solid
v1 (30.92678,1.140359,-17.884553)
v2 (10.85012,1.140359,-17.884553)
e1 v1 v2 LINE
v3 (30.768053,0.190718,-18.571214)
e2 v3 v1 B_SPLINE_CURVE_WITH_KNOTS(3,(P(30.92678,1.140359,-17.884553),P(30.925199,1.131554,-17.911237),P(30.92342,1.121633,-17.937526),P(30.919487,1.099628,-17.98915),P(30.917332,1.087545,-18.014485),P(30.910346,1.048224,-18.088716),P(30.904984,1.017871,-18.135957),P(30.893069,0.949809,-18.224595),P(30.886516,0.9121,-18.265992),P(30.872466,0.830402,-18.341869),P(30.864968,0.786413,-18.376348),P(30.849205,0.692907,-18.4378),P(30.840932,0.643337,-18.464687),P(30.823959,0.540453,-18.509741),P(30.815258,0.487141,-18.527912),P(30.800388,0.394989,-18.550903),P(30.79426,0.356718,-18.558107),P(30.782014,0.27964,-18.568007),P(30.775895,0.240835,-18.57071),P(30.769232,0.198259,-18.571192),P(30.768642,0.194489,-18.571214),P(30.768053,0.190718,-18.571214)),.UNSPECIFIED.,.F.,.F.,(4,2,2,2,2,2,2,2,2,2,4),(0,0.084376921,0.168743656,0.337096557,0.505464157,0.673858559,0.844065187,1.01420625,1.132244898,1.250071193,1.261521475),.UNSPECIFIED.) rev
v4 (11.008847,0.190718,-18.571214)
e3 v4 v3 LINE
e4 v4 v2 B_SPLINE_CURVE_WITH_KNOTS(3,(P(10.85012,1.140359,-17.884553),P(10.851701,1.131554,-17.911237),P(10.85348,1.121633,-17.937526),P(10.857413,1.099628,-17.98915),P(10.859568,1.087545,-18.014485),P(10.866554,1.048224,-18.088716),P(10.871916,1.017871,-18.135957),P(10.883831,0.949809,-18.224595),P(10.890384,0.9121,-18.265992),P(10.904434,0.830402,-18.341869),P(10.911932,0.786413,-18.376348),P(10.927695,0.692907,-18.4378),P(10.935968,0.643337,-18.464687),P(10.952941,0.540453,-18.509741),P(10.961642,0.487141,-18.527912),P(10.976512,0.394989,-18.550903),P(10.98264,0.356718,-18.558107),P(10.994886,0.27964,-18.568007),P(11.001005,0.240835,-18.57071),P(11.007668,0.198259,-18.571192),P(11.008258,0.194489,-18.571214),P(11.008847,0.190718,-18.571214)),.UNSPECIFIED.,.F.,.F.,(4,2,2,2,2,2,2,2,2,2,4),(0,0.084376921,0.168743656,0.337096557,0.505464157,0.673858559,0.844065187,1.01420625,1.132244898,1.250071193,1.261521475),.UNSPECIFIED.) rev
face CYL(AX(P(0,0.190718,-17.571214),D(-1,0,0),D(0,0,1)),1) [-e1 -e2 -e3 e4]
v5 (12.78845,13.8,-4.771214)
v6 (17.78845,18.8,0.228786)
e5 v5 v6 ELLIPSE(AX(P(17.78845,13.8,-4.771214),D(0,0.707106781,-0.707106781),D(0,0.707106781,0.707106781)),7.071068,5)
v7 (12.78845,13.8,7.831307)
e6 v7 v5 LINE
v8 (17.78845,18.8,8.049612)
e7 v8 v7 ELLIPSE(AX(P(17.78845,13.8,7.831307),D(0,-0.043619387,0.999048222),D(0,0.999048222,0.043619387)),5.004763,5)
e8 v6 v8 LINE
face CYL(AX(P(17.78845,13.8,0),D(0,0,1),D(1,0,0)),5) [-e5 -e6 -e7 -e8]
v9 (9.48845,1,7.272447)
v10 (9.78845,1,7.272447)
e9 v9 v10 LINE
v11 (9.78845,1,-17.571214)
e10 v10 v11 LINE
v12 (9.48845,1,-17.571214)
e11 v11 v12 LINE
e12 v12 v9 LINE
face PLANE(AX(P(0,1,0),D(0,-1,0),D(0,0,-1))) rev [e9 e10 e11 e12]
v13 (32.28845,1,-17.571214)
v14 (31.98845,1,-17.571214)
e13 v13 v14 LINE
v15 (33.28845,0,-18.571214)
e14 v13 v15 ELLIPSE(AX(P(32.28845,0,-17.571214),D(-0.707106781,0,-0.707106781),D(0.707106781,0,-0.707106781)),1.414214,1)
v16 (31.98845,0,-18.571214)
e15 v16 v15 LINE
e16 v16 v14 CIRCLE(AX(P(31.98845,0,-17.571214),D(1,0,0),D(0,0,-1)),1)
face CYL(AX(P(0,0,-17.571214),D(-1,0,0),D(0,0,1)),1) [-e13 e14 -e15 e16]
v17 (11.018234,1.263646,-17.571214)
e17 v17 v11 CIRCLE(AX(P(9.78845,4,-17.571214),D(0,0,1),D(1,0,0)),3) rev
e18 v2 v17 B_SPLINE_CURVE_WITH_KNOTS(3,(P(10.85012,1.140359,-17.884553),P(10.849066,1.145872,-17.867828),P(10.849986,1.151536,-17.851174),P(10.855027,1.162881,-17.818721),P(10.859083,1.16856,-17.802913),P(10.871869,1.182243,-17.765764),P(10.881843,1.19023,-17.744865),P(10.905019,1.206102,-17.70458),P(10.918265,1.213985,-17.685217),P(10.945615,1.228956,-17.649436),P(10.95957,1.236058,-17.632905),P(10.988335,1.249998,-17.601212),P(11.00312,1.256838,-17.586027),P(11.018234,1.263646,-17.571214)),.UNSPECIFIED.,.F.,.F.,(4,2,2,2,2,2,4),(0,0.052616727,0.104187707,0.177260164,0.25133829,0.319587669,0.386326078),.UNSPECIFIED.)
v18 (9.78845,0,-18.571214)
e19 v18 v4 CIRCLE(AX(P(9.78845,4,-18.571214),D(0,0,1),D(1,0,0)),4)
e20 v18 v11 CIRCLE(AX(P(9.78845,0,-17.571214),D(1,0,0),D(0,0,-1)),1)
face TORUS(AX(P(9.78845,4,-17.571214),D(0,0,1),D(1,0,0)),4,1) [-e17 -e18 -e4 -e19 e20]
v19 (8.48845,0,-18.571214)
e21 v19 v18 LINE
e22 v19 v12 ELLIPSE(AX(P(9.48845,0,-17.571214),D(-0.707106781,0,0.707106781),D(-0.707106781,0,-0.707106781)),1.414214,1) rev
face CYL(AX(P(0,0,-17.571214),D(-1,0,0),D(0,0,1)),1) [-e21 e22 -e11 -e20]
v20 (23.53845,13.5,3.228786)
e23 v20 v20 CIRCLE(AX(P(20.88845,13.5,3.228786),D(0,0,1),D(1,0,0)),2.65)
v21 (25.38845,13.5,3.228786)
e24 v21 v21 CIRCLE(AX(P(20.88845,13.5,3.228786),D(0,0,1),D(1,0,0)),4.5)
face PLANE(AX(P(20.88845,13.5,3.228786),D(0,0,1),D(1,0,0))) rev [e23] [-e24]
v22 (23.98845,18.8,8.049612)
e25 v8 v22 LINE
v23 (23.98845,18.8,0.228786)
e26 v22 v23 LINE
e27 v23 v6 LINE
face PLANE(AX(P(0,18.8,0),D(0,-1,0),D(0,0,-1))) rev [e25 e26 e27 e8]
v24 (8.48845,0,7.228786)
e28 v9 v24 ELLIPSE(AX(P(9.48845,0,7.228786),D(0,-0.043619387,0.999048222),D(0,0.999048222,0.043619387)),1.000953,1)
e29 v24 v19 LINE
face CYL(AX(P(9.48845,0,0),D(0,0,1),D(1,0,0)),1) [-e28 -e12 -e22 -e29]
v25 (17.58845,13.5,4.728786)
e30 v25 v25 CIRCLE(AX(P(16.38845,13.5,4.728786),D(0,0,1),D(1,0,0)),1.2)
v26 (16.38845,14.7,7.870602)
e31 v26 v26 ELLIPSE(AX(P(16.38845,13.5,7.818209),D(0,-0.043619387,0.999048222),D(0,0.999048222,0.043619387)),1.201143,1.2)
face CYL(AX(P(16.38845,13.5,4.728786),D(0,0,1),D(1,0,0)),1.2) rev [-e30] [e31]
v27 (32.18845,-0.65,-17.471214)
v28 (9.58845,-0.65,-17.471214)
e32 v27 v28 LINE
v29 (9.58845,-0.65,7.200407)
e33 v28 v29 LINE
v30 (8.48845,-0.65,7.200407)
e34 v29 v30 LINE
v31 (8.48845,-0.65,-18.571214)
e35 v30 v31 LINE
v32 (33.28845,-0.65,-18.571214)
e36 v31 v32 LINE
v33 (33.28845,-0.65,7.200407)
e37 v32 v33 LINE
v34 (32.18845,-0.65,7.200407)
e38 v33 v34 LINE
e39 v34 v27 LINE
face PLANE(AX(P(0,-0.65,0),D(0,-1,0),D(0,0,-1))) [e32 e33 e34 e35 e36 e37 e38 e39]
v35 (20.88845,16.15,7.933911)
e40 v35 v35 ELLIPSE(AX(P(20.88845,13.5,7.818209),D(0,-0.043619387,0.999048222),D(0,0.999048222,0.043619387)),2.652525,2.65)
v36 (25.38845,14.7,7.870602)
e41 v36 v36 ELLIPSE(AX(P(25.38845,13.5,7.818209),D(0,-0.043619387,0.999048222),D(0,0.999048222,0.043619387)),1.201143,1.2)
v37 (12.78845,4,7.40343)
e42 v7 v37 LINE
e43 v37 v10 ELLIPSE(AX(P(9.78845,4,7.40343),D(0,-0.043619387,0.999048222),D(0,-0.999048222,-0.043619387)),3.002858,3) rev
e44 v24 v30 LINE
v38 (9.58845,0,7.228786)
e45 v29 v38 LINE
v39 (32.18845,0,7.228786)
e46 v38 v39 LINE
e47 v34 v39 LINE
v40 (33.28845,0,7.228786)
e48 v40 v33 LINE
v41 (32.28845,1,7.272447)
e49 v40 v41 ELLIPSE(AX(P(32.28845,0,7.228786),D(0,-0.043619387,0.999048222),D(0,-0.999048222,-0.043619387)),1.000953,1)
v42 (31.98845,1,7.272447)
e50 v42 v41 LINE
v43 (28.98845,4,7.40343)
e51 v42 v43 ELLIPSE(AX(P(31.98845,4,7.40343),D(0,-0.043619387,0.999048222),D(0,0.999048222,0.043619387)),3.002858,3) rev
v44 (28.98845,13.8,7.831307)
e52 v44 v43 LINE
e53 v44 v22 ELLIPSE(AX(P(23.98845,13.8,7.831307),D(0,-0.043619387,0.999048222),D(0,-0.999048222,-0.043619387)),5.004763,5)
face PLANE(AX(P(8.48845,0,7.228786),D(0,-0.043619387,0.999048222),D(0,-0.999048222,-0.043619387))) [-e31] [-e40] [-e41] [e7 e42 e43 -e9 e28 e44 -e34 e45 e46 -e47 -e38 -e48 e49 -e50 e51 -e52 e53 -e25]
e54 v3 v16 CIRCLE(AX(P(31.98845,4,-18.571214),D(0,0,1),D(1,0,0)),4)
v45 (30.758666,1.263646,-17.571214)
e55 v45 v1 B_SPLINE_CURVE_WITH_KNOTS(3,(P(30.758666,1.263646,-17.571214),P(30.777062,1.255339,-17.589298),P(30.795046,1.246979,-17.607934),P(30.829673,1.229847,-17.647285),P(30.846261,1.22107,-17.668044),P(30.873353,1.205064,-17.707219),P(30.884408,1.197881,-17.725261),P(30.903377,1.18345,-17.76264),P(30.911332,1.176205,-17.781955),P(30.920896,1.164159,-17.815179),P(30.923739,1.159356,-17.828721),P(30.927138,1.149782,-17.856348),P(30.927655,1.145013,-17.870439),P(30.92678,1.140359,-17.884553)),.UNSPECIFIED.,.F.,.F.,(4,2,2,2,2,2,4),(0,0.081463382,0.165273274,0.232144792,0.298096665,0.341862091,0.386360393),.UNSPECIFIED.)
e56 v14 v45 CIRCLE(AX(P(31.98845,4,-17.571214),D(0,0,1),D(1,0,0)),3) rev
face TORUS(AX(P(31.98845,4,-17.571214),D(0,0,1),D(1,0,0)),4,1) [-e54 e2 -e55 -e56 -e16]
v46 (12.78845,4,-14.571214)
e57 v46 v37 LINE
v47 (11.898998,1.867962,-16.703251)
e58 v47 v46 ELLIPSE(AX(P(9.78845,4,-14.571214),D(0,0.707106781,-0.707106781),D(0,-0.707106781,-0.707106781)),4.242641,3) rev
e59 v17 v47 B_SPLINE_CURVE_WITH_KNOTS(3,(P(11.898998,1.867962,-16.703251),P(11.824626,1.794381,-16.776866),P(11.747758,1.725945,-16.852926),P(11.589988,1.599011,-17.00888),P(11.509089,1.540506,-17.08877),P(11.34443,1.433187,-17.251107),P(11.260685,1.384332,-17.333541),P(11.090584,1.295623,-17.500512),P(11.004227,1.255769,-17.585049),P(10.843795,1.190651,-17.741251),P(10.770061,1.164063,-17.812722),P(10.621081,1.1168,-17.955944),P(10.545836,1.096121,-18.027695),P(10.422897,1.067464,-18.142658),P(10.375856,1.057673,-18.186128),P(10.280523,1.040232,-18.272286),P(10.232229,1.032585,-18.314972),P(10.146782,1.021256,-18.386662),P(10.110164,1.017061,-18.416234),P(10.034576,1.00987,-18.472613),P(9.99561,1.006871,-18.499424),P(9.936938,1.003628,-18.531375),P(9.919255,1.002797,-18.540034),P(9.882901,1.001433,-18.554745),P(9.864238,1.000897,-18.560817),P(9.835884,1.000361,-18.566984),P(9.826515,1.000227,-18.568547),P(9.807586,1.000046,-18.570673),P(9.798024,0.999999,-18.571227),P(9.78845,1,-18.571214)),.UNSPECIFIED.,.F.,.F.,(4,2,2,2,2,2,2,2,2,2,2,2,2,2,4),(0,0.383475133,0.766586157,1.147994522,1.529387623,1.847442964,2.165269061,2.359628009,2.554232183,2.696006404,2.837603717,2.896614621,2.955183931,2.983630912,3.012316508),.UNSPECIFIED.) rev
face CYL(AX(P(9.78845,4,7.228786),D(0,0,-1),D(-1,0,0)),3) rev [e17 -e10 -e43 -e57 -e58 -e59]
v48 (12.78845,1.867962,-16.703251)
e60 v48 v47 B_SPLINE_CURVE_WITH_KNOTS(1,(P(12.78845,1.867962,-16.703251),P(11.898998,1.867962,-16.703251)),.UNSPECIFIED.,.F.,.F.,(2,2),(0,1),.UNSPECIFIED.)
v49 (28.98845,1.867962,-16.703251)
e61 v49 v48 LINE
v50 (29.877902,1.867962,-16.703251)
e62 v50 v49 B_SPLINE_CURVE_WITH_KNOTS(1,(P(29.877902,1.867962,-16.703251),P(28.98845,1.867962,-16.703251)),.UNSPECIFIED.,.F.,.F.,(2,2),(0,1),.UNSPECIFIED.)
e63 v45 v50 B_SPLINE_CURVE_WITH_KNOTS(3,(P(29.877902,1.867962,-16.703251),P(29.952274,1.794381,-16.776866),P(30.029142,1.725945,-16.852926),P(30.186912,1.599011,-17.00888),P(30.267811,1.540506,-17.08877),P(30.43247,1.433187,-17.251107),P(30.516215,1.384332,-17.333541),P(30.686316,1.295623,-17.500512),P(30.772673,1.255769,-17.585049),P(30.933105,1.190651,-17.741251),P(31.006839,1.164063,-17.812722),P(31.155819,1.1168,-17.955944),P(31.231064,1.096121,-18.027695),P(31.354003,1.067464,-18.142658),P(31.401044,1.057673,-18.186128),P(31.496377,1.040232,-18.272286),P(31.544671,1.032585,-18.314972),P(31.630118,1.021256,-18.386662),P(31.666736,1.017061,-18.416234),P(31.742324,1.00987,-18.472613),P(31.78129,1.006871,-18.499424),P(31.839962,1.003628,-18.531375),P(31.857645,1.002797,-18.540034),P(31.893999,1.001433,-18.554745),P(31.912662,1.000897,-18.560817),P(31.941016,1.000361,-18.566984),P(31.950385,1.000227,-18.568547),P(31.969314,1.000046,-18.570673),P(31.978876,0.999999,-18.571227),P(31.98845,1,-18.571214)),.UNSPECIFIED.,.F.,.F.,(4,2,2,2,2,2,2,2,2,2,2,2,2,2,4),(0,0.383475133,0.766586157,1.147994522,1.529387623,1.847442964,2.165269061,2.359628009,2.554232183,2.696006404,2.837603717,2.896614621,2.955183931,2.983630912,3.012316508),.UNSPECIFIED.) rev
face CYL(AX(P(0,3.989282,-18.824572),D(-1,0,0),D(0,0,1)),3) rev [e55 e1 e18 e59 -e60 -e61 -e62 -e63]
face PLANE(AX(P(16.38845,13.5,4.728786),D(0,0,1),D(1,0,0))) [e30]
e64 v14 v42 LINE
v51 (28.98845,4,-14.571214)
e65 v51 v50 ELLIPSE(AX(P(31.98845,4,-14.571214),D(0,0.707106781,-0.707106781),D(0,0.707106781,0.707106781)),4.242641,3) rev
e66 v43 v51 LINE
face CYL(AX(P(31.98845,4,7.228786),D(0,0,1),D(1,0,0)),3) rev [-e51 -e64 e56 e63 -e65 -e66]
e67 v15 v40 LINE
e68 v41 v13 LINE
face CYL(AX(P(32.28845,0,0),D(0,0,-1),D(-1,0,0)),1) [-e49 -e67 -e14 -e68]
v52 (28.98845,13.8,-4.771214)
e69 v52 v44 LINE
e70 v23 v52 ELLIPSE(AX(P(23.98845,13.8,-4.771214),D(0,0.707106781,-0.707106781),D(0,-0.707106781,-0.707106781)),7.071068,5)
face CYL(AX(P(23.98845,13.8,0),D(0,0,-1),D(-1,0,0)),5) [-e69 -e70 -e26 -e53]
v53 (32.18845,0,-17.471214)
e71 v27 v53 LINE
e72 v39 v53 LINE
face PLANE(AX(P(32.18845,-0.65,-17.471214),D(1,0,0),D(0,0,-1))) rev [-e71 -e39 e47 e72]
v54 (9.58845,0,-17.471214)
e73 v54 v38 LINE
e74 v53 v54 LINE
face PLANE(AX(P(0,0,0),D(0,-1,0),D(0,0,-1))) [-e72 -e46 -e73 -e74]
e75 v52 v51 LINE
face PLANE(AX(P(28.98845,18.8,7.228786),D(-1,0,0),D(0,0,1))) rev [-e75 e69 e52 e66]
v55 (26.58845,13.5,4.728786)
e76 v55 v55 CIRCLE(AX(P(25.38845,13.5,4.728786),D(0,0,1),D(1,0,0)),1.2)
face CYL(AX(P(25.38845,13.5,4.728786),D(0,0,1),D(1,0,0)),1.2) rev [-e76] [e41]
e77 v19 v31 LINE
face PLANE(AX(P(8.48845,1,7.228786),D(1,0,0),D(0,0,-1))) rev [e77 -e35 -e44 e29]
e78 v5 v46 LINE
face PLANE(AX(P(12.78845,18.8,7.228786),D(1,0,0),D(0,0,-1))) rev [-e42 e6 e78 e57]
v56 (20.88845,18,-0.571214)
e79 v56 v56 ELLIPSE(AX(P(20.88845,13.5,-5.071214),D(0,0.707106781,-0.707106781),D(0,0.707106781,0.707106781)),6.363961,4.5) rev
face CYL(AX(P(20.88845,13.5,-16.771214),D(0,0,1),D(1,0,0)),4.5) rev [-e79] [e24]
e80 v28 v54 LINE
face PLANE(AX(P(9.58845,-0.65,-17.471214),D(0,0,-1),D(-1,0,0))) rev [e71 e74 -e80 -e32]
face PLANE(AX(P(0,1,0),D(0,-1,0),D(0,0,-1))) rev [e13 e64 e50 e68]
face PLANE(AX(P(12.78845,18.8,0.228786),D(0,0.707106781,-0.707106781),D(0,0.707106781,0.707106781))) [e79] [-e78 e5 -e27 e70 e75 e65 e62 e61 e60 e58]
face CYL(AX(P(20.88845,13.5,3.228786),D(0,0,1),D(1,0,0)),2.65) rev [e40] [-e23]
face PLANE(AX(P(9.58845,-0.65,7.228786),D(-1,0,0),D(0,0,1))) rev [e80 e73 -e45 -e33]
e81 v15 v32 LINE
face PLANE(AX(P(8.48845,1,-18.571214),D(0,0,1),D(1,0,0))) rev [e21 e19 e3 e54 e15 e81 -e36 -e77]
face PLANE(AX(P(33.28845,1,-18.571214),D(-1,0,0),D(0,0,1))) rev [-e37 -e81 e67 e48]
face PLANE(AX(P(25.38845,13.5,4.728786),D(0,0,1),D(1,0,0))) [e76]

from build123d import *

# Parameters (mm, degrees)
SKETCH1_W             = 24.8
SKETCH1_H             = 25.8
BOSS_EXTRUDE1_DEPTH   = 1
SKETCH3_W             = 16.2
SKETCH3_H             = 7
BOSS_EXTRUDE3_DEPTH   = 17.8
DRAFT2_ANGLE          = 45
TOP_FILLET_R          = 5
SKETCH4_R             = 2.65
HOLE_BOLT_DEPTH       = 4
SKETCH5_R             = 4.5
HOLE_BOLT_CAP_DEPTH   = 20
SKETCH6_R             = 1.2
HOLES_DOWEL_PIN_DEPTH = 2.5
BASE_FILLET_R         = 3
BRIM_DEPTH            = 0.65
INWARD_SLANT_ANGLE    = 2.5
FILLET1_START         = 8.48845
FILLET1_2_DEPTH       = 24.8
FILLET1_3_DEPTH       = 1.3
FILLET1_START_2       = 31.98845
FILLET1_4_DEPTH       = 1.3
FILLET1_START_3       = -20
FILLET1_5_DEPTH       = 28


with BuildPart() as part:
    # Sketch1 → Boss-Extrude1 (new body)
    with BuildSketch(Plane(origin=(0, 0, 0), x_dir=(1, 0, 0), z_dir=(0, 1, 0))):
        with Locations((20.88845, 5.671213532)):
            Rectangle(SKETCH1_W, SKETCH1_H)
    extrude(amount=BOSS_EXTRUDE1_DEPTH)

    # Sketch3 → Boss-Extrude3 (add)
    with BuildSketch(Plane(origin=(0, 1, 0), x_dir=(1, 0, 0), z_dir=(0, 1, 0))):
        with Locations((20.88845, -3.728786468)):
            Rectangle(SKETCH3_W, SKETCH3_H)
    extrude(amount=BOSS_EXTRUDE3_DEPTH)

    # Draft2
    draft2_faces = [part.faces().sort_by_distance(p)[0] for p in [
        (20.88845, 9.9, 0.228786468),
    ]]
    draft(draft2_faces, Plane.ZX.offset(18.8), DRAFT2_ANGLE)

    # top_fillet
    top_fillet_edges = [part.edges().sort_by_distance(p)[0] for p in [
        (12.78845, 18.8, 3.728786468),
        (28.98845, 18.8, 3.728786468),
    ]]
    fillet(top_fillet_edges, radius=TOP_FILLET_R)

    # Sketch4 → hole_bolt (cut)
    with BuildSketch(Plane.XY.offset(7.228786468)):
        with Locations((20.88845, 13.5)):
            Circle(SKETCH4_R)
    extrude(amount=-HOLE_BOLT_DEPTH, mode=Mode.SUBTRACT)

    # Sketch5 → hole_bolt_cap (cut)
    with BuildSketch(Plane.XY.offset(3.228786468)):
        with Locations((20.88845, 13.5)):
            Circle(SKETCH5_R)
    extrude(amount=-HOLE_BOLT_CAP_DEPTH, mode=Mode.SUBTRACT)

    # Sketch6 → holes_dowel_pin (cut)
    with BuildSketch(Plane.XY.offset(7.228786468)):
        with Locations((25.38845, 13.5)):
            Circle(SKETCH6_R)
        with Locations((16.38845, 13.5)):
            Circle(SKETCH6_R)
    extrude(amount=-HOLES_DOWEL_PIN_DEPTH, mode=Mode.SUBTRACT)

    # base_fillet
    # the kernel refuses this fillet: 3 mm, written as the material it adds along each edge
    with BuildSketch(Plane(origin=(12.78845, 1, -25.071213532), x_dir=(-1, 0, 0), z_dir=(0, 0, 1))) as base_fillet_piece_1_section:
        with BuildLine():
            CenterArc((BASE_FILLET_R, -BASE_FILLET_R), BASE_FILLET_R, 90, 90)
            Line((0, -BASE_FILLET_R), (0, 0))
            Line((0, 0), (BASE_FILLET_R, 0))
        make_face()
    base_fillet_piece_1 = extrude(amount=32.3, mode=Mode.PRIVATE)
    base_fillet_piece_1 = split(base_fillet_piece_1, bisect_by=Plane(origin=(12.78845, -2.75, -21.321213532), z_dir=(0, -0.7071067811865488, 0.7071067811865462)), keep=Keep.TOP, mode=Mode.PRIVATE)
    add(base_fillet_piece_1)
    with BuildSketch(Plane(origin=(28.98845, 1, 7.228786468), x_dir=(0, 1, 0), z_dir=(0, 0, -1))) as base_fillet_piece_2_section:
        with BuildLine():
            CenterArc((BASE_FILLET_R, BASE_FILLET_R), BASE_FILLET_R, 180, 90)
            Line((0, BASE_FILLET_R), (0, 0))
            Line((0, 0), (BASE_FILLET_R, 0))
        make_face()
    base_fillet_piece_2 = extrude(amount=32.3, mode=Mode.PRIVATE)
    base_fillet_piece_2 = split(base_fillet_piece_2, bisect_by=Plane(origin=(28.98845, 13.4, -5.171213532), z_dir=(0, -0.7071067811865488, 0.7071067811865462)), keep=Keep.TOP, mode=Mode.PRIVATE)
    add(base_fillet_piece_2)
    with BuildSketch(Plane(origin=(28.98845, 1, -17.571213532), x_dir=(0, 0, -1), z_dir=(-1, 0, 0))) as base_fillet_piece_3:
        with BuildLine():
            CenterArc((1.25335823, -2.989282457), BASE_FILLET_R, 94.844556223, 40.155443777)
            Line((-0.867962113, -0.867962113), (0, 0))
            Line((0, 0), (1, 0))
        make_face()
    extrude(amount=16.2)
    with BuildSketch(Plane(origin=(12.78845, 1, -25.071213532), x_dir=(-1, 0, 0), z_dir=(0, 0, 1))) as base_fillet_piece_4a_section:
        with BuildLine():
            CenterArc((BASE_FILLET_R, -BASE_FILLET_R), BASE_FILLET_R, 90, 90)
            Line((0, -BASE_FILLET_R), (0, 0))
            Line((0, 0), (BASE_FILLET_R, 0))
        make_face()
    base_fillet_piece_4a = extrude(amount=32.3, mode=Mode.PRIVATE)
    base_fillet_piece_4a = split(base_fillet_piece_4a, bisect_by=Plane(origin=(12.78845, -2.75, -21.321213532), z_dir=(0, 0.7071067811865488, -0.7071067811865462)), keep=Keep.TOP, mode=Mode.PRIVATE)
    base_fillet_piece_4a = split(base_fillet_piece_4a, bisect_by=Plane(origin=(12.78845, 1, -18.571213532), z_dir=(0, 0, 1)), keep=Keep.TOP, mode=Mode.PRIVATE)
    with BuildSketch(Plane(origin=(28.98845, 1, -17.571213532), x_dir=(0, 0, -1), z_dir=(-1, 0, 0))) as base_fillet_piece_4b_section:
        with BuildLine():
            CenterArc((1.25335823, -2.989282457), BASE_FILLET_R, 94.844556223, 40.155443777)
            Line((-0.867962113, -0.867962113), (0, 0))
            Line((0, 0), (1, 0))
        make_face()
    base_fillet_piece_4b = extrude(amount=19.268709481, mode=Mode.PRIVATE)
    base_fillet_piece_4b = split(base_fillet_piece_4b, bisect_by=Plane(origin=(12.78845, 1, -17.571213532), z_dir=(-1, 0, 0)), keep=Keep.TOP, mode=Mode.PRIVATE)
    base_fillet_piece_4 = base_fillet_piece_4a & base_fillet_piece_4b
    add(base_fillet_piece_4)
    with BuildSketch(Plane(origin=(28.98845, 1, 7.228786468), x_dir=(0, 1, 0), z_dir=(0, 0, -1))) as base_fillet_piece_5a_section:
        with BuildLine():
            CenterArc((BASE_FILLET_R, BASE_FILLET_R), BASE_FILLET_R, 180, 90)
            Line((0, BASE_FILLET_R), (0, 0))
            Line((0, 0), (BASE_FILLET_R, 0))
        make_face()
    base_fillet_piece_5a = extrude(amount=32.3, mode=Mode.PRIVATE)
    base_fillet_piece_5a = split(base_fillet_piece_5a, bisect_by=Plane(origin=(28.98845, 13.4, -5.171213532), z_dir=(0, 0.7071067811865488, -0.7071067811865462)), keep=Keep.TOP, mode=Mode.PRIVATE)
    base_fillet_piece_5a = split(base_fillet_piece_5a, bisect_by=Plane(origin=(28.98845, 1, -18.571213532), z_dir=(0, 0, 1)), keep=Keep.TOP, mode=Mode.PRIVATE)
    with BuildSketch(Plane(origin=(32.057159481, 1, -17.571213532), x_dir=(0, 0, -1), z_dir=(-1, 0, 0))) as base_fillet_piece_5b_section:
        with BuildLine():
            CenterArc((1.25335823, -2.989282457), BASE_FILLET_R, 94.844556223, 40.155443777)
            Line((-0.867962113, -0.867962113), (0, 0))
            Line((0, 0), (1, 0))
        make_face()
    base_fillet_piece_5b = extrude(amount=19.268709481, mode=Mode.PRIVATE)
    base_fillet_piece_5b = split(base_fillet_piece_5b, bisect_by=Plane(origin=(28.98845, 1, -17.571213532), z_dir=(1, 0, 0)), keep=Keep.TOP, mode=Mode.PRIVATE)
    base_fillet_piece_5 = base_fillet_piece_5a & base_fillet_piece_5b
    add(base_fillet_piece_5)

    # Sketch8 → brim (add)
    with BuildSketch(Plane.XZ):
        Polygon((8.48845, 7.228786468), (9.58845, 7.228786468), (9.58845, -17.471213532), (32.18845, -17.471213532), (32.18845, 7.228786468), (33.28845, 7.228786468), (33.28845, -18.571213532), (8.48845, -18.571213532), align=None)
    extrude(amount=BRIM_DEPTH)

    # inward_slant
    inward_slant_faces = [part.faces().sort_by_distance(p)[0] for p in [
        (20.88845, 8.182651501, 7.228786468),
    ]]
    draft(inward_slant_faces, Plane(origin=(0, 0, 0), x_dir=(0, 0, -1), z_dir=(0, -1, 0)), INWARD_SLANT_ANGLE)

    # Fillet1: read off the stored shape, not the designer's step
    # Fillet1 outline → Fillet1 (revolve, cut)
    with BuildSketch(Plane(origin=(9.78845, 4, 0), x_dir=(1, 0, 0), z_dir=(0, -1, 0))):
        with BuildLine():
            ThreePointArc((4, -18.571213532), (3.292893219, -18.278320313), (3, -17.571213532))
            Line((3, -17.571213532), (3, -18.571213532))
            Line((3, -18.571213532), (4, -18.571213532))
        make_face()
    revolve(axis=Axis((9.78845, 4, 0), (0, 0, 1)), mode=Mode.SUBTRACT)

    # Fillet1 2 outline → Fillet1 2 (cut)
    with BuildSketch(Plane.YZ.offset(FILLET1_START)):
        with BuildLine():
            Line((1, -18.254186707), (1, -18.158633642))
            ThreePointArc((1, -18.158633642), (0.644909369, -18.462117598), (0.19071784, -18.571213532))
            Line((0.19071784, -18.571213532), (1, -18.571213532))
            Line((1, -18.571213532), (1, -18.254186707))
        make_face()
        with BuildLine():
            ThreePointArc((1.140358994, -17.884553089), (1.080792468, -18.027028359), (1, -18.158633642))
            Line((1, -18.158633642), (1, -18.254186707))
            Line((1, -18.254186707), (0.999995093, -18.571271439))
            ThreePointArc((0.999995093, -18.571271439), (1.050052637, -18.223798874), (1.140358994, -17.884553089))
        make_face()
    extrude(amount=FILLET1_2_DEPTH, mode=Mode.SUBTRACT)

    # Fillet1 3 outline → Fillet1 3 (cut)
    with BuildSketch(Plane.YZ.offset(FILLET1_START)):
        with BuildLine():
            Line((1, -18.158633642), (1, -17.571213532))
            ThreePointArc((1, -17.571213532), (0.707106781, -18.278320313), (0, -18.571213532))
            Line((0, -18.571213532), (0.19071784, -18.571213532))
            ThreePointArc((0.19071784, -18.571213532), (0.644909369, -18.462117598), (1, -18.158633642))
        make_face()
    extrude(amount=FILLET1_3_DEPTH, mode=Mode.SUBTRACT)

    # Fillet1 4 outline → Fillet1 4 (cut)
    with BuildSketch(Plane.YZ.offset(FILLET1_START_2)):
        with BuildLine():
            Line((1, -18.158633642), (1, -17.571213532))
            ThreePointArc((1, -17.571213532), (0.707106781, -18.278320313), (0, -18.571213532))
            Line((0, -18.571213532), (0.19071784, -18.571213532))
            ThreePointArc((0.19071784, -18.571213532), (0.644909369, -18.462117598), (1, -18.158633642))
        make_face()
    extrude(amount=FILLET1_4_DEPTH, mode=Mode.SUBTRACT)

    # Fillet1 5 outline → Fillet1 5 (cut)
    with BuildSketch(Plane.XY.offset(FILLET1_START_3)):
        with BuildLine():
            ThreePointArc((8.48845, 0), (8.781343219, 0.707106781), (9.48845, 1))
            Line((9.48845, 1), (8.48845, 1))
            Line((8.48845, 1), (8.48845, 0))
        make_face()
        with BuildLine():
            Line((33.28845, 1), (32.28845, 1))
            ThreePointArc((32.28845, 1), (32.995556781, 0.707106781), (33.28845, 0))
            Line((33.28845, 0), (33.28845, 1))
        make_face()
    extrude(amount=FILLET1_5_DEPTH, mode=Mode.SUBTRACT)

    # Fillet1 6 outline → Fillet1 6 (revolve, cut)
    with BuildSketch(Plane(origin=(31.98845, 4, 0), x_dir=(1, 0, 0), z_dir=(0, -1, 0))):
        with BuildLine():
            ThreePointArc((4, -18.571213532), (3.292893219, -18.278320313), (3, -17.571213532))
            Line((3, -17.571213532), (3, -18.571213532))
            Line((3, -18.571213532), (4, -18.571213532))
        make_face()
    revolve(axis=Axis((31.98845, 4, 0), (0, 0, 1)), mode=Mode.SUBTRACT)


solid = part.part
